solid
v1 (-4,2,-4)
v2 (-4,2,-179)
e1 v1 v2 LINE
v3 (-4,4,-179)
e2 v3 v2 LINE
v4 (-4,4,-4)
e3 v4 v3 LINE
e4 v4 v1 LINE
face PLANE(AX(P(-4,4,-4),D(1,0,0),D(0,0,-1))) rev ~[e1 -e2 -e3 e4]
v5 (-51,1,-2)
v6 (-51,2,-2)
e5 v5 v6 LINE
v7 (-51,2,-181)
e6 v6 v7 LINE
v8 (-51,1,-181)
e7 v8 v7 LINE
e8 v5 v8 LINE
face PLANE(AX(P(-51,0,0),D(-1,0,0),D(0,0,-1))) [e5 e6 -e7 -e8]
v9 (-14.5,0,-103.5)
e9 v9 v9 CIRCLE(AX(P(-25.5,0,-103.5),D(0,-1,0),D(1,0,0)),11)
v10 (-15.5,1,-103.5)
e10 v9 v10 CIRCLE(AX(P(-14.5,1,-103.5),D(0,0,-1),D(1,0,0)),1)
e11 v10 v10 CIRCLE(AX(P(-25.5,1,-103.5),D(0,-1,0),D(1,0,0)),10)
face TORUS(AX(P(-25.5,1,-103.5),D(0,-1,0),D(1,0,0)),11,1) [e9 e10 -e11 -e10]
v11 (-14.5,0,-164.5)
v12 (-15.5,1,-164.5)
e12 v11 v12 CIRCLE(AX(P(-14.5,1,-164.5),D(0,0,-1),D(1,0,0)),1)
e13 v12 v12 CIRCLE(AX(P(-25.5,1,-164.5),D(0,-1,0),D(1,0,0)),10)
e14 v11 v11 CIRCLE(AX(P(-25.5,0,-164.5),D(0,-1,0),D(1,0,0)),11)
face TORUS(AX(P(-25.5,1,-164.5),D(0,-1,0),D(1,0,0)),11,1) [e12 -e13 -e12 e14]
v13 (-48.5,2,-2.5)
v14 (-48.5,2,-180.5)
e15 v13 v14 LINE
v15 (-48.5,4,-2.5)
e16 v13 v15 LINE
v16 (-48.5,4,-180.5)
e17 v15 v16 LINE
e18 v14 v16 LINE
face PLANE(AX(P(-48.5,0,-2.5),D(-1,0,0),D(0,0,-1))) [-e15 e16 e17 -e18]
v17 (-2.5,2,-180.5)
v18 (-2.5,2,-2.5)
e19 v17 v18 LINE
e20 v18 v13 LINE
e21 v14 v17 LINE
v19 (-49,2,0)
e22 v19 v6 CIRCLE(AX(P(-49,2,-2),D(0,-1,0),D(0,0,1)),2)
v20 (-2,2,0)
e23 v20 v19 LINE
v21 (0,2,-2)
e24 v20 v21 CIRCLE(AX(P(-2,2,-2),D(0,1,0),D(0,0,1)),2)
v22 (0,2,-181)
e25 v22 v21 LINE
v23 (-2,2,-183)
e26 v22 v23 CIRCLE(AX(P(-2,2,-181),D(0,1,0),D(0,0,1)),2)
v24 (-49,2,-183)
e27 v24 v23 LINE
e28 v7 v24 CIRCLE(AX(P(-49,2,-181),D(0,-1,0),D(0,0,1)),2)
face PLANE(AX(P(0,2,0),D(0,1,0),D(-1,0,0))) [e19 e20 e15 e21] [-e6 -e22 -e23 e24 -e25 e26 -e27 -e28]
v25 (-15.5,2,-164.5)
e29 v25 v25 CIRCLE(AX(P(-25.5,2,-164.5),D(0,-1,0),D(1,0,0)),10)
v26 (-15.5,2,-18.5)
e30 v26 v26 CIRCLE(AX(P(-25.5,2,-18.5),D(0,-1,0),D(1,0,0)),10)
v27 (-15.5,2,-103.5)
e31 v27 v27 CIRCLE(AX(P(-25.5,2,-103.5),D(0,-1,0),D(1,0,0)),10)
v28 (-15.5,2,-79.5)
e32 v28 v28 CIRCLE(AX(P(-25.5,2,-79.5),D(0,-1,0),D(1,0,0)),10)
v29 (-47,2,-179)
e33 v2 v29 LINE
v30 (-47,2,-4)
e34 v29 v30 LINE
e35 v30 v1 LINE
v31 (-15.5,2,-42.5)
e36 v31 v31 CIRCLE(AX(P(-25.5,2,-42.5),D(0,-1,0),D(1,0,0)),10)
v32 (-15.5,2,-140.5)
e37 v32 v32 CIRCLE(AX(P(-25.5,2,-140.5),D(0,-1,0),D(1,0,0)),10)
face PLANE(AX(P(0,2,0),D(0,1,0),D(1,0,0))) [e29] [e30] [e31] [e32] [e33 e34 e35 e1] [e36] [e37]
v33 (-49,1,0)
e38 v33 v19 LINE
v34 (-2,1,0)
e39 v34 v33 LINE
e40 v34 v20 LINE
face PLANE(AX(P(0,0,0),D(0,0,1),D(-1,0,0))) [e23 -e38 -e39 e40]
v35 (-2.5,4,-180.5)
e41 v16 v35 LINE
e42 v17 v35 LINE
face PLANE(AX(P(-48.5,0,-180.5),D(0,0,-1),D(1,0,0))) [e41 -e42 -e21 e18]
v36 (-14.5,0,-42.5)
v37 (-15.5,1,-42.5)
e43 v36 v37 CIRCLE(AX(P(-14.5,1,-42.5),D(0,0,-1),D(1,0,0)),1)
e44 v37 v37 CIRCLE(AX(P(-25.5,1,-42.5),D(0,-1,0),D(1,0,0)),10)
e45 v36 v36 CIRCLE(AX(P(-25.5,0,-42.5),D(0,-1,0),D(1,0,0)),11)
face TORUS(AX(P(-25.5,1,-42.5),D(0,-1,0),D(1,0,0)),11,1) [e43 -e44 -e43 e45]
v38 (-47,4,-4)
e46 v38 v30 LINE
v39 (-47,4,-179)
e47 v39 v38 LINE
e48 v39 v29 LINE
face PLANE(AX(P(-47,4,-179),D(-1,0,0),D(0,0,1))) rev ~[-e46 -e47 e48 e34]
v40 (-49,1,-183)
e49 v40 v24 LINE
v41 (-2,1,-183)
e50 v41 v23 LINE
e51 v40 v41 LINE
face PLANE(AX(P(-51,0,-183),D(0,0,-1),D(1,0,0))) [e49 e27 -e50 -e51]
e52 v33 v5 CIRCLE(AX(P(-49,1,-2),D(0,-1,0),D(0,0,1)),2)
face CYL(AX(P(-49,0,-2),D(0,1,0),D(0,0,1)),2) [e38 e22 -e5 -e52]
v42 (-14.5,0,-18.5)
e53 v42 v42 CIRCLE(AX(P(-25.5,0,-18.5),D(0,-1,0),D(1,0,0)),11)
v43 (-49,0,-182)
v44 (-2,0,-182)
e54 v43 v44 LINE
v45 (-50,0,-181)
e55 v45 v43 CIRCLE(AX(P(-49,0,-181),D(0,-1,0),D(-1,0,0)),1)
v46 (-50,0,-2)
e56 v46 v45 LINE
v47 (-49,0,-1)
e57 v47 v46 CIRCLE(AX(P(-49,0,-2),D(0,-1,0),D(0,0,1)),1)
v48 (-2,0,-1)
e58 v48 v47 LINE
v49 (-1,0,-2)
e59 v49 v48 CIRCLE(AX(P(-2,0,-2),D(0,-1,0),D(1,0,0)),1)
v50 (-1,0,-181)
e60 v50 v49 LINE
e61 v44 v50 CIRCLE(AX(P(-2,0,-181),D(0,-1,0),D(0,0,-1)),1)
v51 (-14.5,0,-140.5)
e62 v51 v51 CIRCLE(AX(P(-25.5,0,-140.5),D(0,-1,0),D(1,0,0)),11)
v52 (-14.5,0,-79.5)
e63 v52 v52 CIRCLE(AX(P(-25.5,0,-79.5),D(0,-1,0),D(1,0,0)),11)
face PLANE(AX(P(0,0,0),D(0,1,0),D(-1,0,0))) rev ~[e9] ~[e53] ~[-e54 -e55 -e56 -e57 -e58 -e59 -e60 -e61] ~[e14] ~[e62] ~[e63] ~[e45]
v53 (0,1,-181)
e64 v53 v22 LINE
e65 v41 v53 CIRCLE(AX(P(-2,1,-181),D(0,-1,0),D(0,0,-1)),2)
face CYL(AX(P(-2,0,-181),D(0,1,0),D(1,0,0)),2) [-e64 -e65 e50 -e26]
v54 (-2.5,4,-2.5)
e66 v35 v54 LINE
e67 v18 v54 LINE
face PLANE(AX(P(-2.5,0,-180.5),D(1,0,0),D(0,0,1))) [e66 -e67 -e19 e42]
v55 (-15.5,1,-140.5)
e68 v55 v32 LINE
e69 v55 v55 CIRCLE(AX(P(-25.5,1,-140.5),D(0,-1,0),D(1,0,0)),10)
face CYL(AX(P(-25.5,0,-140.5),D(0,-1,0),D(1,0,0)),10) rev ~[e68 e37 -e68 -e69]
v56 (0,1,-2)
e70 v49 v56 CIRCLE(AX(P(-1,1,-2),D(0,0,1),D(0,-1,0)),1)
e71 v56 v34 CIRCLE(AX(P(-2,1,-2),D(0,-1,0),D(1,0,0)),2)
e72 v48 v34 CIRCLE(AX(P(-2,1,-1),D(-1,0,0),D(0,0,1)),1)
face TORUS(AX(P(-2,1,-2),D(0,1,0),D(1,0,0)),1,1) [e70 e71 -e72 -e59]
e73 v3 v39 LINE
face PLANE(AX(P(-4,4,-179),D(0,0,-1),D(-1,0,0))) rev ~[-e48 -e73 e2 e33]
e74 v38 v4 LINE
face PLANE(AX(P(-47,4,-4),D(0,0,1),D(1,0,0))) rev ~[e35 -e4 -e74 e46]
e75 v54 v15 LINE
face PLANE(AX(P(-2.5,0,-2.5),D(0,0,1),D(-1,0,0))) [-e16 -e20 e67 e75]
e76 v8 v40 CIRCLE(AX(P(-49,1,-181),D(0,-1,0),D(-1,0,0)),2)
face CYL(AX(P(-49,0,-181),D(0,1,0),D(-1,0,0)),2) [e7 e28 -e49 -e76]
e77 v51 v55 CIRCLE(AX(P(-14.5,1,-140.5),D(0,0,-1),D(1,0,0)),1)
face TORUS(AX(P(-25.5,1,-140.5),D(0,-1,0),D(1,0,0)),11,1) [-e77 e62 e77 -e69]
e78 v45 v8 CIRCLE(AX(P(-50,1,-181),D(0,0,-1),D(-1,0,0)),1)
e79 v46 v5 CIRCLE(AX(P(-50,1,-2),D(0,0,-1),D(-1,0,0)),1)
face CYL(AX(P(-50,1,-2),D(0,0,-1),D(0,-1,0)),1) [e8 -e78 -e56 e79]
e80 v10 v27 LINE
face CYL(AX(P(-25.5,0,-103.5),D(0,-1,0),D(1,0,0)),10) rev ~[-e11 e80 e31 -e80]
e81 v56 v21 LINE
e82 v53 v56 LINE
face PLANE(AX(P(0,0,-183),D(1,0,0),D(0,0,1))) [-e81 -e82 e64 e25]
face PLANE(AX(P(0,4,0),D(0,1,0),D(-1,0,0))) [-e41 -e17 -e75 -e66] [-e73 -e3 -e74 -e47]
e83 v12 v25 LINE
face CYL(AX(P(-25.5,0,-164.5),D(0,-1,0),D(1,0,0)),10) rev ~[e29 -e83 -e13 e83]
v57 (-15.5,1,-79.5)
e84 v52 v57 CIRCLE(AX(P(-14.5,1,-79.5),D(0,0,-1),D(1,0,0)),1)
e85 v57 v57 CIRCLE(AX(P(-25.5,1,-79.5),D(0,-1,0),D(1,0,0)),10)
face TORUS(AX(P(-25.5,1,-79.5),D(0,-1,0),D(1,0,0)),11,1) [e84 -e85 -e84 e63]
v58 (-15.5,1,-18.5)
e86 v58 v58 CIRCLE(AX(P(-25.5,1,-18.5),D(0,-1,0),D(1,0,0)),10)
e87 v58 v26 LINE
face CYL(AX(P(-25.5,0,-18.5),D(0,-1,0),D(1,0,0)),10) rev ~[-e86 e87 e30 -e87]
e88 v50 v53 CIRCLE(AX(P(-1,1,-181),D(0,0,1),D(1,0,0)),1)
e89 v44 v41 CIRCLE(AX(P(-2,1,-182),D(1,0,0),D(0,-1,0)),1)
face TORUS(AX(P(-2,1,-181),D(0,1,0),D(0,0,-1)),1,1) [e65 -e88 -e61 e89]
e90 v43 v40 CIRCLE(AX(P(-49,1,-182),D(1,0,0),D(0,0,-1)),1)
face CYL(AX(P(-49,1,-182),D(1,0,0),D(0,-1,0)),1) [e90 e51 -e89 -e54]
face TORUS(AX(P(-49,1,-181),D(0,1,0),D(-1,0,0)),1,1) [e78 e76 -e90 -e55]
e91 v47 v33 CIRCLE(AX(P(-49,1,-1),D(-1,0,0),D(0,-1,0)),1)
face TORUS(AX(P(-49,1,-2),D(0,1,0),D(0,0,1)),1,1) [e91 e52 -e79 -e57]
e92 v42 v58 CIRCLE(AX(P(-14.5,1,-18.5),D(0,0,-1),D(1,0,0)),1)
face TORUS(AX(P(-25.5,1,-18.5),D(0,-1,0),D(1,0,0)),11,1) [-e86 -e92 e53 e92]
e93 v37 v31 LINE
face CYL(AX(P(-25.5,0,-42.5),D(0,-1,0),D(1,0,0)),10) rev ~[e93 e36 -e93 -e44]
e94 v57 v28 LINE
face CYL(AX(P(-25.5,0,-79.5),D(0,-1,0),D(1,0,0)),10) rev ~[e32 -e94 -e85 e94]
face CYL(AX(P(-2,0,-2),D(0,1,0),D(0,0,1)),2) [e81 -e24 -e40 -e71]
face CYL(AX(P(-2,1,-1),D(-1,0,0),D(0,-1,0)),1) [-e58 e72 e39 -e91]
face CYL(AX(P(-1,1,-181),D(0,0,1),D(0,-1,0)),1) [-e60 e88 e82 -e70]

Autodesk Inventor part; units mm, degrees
ref_plane "YZ Plane" through (0, 0, 0) normal (1, 0, 0) x (0, 1, 0)
ref_plane "XZ Plane" through (0, 0, 0) normal (0, 1, 0) x (-1, 0, 0)
ref_plane "XY Plane" through (0, 0, 0) normal (0, 0, 1) x (1, 0, 0)
sketch "Sketch1" plane through (0, 0, 0) normal (0, 1, 0) x (-1, 0, 0)
  line L0 (0, 0) -> (51, 0)
  line L1 (51, 0) -> (51, -183)
  line L2 (51, -183) -> (0, -183)
  line L3 (0, -183) -> (0, 0)
  line L4 (2.5, -2.5) -> (48.5, -2.5)
  line L5 (48.5, -2.5) -> (48.5, -180.5)
  line L6 (48.5, -180.5) -> (2.5, -180.5)
  line L7 (2.5, -180.5) -> (2.5, -2.5)
  line L8 (2.5, -2.5) -> (48.5, -180.5) construction
  line L9 (48.5, -2.5) -> (2.5, -180.5) construction
  point P0 (25.5, -91.5)
  dimension "d0" = 51
  dimension "d1" = 183
  dimension "d2" = 46
  dimension "d3" = 178
  dimension "d4" = 2.5
  dimension "d5" = 2.5
extrude "Extrusion1" add sketch "Sketch1" along normal blind 2
extrude "Extrusion2" add sketch "Sketch1" along normal blind 4 contours L4 L5 L6 L7
sketch "Sketch2" plane through (0, 4, 0) normal (0, 1, 0) x (1, 0, 0)
  point P0 (0, 0)
sketch "Sketch3" plane through (0, 4, 0) normal (0, 1, 0) x (1, 0, 0)
  line L0 (-47, 4) -> (-4, 4)
  line L1 (-4, 4) -> (-4, 179)
  line L2 (-4, 179) -> (-47, 179)
  line L3 (-47, 179) -> (-47, 4)
  line L4 (-47, 4) -> (-4, 179) construction
  line L5 (-4, 4) -> (-47, 179) construction
  line L6 (-48.5, 2.5) -> (-2.5, 2.5) projected
  line L7 (-48.5, 180.5) -> (-48.5, 2.5) projected
  point P0 (0, 0)
  point P1 (-25.5, 91.5)
  dimension "d10" = 43
  dimension "d11" = 175
  dimension "d12" = 1.5
  dimension "d13" = 1.5
extrude "Extrusion3" cut sketch "Sketch3" against normal blind 2
sketch "Sketch4" plane through (0, 0, 0) normal (0, -1, 0) x (1, 0, 0)
  point P0 (0, 0)
sketch "Sketch5" plane through (0, 0, 0) normal (0, -1, 0) x (1, 0, 0)
  circle A0 centre (-25.5, -18.5) radius 10
  circle A1 centre (-25.5, -42.5) radius 10
  circle A2 centre (-25.5, -79.5) radius 10
  circle A3 centre (-25.5, -103.5) radius 10
  circle A4 centre (-25.5, -140.5) radius 10
  circle A5 centre (-25.5, -164.5) radius 10
  point P0 (0, 0)
  dimension "d16" = 20
  dimension "d17" = 20
  dimension "d18" = 20
  dimension "d19" = 20
  dimension "d20" = 20
  dimension "d21" = 20
sketch "Sketch6" plane through (0, 0, 0) normal (0, -1, 0) x (1, 0, 0)
  point P0 (0, 0)
extrude "Extrusion4" cut sketch "Sketch5" against normal blind 5
fillet "Fillet1" radius 2 4 edges at (-51, 1, 0) (-51, 1, -183) (0, 1, -183) (0, 1, 0)
fillet "Fillet2" radius 1 6 edges at (-35.5, 0, -103.5) (-35.5, 0, -79.5) (-35.5, 0, -42.5) (-35.5, 0, -18.5) (-35.5, 0, -140.5) (-35.5, 0, -164.5)
fillet "Fillet3" radius 1 8 edges at (-50.4142, 0, -182.4142) (-25.5, 0, -183) (-0.5858, 0, -182.4142) (0, 0, -91.5) (-0.5858, 0, -0.5858) (-25.5, 0, 0) (-50.4142, 0, -0.5858) (-51, 0, -91.5)
properties part number "nixielid"
